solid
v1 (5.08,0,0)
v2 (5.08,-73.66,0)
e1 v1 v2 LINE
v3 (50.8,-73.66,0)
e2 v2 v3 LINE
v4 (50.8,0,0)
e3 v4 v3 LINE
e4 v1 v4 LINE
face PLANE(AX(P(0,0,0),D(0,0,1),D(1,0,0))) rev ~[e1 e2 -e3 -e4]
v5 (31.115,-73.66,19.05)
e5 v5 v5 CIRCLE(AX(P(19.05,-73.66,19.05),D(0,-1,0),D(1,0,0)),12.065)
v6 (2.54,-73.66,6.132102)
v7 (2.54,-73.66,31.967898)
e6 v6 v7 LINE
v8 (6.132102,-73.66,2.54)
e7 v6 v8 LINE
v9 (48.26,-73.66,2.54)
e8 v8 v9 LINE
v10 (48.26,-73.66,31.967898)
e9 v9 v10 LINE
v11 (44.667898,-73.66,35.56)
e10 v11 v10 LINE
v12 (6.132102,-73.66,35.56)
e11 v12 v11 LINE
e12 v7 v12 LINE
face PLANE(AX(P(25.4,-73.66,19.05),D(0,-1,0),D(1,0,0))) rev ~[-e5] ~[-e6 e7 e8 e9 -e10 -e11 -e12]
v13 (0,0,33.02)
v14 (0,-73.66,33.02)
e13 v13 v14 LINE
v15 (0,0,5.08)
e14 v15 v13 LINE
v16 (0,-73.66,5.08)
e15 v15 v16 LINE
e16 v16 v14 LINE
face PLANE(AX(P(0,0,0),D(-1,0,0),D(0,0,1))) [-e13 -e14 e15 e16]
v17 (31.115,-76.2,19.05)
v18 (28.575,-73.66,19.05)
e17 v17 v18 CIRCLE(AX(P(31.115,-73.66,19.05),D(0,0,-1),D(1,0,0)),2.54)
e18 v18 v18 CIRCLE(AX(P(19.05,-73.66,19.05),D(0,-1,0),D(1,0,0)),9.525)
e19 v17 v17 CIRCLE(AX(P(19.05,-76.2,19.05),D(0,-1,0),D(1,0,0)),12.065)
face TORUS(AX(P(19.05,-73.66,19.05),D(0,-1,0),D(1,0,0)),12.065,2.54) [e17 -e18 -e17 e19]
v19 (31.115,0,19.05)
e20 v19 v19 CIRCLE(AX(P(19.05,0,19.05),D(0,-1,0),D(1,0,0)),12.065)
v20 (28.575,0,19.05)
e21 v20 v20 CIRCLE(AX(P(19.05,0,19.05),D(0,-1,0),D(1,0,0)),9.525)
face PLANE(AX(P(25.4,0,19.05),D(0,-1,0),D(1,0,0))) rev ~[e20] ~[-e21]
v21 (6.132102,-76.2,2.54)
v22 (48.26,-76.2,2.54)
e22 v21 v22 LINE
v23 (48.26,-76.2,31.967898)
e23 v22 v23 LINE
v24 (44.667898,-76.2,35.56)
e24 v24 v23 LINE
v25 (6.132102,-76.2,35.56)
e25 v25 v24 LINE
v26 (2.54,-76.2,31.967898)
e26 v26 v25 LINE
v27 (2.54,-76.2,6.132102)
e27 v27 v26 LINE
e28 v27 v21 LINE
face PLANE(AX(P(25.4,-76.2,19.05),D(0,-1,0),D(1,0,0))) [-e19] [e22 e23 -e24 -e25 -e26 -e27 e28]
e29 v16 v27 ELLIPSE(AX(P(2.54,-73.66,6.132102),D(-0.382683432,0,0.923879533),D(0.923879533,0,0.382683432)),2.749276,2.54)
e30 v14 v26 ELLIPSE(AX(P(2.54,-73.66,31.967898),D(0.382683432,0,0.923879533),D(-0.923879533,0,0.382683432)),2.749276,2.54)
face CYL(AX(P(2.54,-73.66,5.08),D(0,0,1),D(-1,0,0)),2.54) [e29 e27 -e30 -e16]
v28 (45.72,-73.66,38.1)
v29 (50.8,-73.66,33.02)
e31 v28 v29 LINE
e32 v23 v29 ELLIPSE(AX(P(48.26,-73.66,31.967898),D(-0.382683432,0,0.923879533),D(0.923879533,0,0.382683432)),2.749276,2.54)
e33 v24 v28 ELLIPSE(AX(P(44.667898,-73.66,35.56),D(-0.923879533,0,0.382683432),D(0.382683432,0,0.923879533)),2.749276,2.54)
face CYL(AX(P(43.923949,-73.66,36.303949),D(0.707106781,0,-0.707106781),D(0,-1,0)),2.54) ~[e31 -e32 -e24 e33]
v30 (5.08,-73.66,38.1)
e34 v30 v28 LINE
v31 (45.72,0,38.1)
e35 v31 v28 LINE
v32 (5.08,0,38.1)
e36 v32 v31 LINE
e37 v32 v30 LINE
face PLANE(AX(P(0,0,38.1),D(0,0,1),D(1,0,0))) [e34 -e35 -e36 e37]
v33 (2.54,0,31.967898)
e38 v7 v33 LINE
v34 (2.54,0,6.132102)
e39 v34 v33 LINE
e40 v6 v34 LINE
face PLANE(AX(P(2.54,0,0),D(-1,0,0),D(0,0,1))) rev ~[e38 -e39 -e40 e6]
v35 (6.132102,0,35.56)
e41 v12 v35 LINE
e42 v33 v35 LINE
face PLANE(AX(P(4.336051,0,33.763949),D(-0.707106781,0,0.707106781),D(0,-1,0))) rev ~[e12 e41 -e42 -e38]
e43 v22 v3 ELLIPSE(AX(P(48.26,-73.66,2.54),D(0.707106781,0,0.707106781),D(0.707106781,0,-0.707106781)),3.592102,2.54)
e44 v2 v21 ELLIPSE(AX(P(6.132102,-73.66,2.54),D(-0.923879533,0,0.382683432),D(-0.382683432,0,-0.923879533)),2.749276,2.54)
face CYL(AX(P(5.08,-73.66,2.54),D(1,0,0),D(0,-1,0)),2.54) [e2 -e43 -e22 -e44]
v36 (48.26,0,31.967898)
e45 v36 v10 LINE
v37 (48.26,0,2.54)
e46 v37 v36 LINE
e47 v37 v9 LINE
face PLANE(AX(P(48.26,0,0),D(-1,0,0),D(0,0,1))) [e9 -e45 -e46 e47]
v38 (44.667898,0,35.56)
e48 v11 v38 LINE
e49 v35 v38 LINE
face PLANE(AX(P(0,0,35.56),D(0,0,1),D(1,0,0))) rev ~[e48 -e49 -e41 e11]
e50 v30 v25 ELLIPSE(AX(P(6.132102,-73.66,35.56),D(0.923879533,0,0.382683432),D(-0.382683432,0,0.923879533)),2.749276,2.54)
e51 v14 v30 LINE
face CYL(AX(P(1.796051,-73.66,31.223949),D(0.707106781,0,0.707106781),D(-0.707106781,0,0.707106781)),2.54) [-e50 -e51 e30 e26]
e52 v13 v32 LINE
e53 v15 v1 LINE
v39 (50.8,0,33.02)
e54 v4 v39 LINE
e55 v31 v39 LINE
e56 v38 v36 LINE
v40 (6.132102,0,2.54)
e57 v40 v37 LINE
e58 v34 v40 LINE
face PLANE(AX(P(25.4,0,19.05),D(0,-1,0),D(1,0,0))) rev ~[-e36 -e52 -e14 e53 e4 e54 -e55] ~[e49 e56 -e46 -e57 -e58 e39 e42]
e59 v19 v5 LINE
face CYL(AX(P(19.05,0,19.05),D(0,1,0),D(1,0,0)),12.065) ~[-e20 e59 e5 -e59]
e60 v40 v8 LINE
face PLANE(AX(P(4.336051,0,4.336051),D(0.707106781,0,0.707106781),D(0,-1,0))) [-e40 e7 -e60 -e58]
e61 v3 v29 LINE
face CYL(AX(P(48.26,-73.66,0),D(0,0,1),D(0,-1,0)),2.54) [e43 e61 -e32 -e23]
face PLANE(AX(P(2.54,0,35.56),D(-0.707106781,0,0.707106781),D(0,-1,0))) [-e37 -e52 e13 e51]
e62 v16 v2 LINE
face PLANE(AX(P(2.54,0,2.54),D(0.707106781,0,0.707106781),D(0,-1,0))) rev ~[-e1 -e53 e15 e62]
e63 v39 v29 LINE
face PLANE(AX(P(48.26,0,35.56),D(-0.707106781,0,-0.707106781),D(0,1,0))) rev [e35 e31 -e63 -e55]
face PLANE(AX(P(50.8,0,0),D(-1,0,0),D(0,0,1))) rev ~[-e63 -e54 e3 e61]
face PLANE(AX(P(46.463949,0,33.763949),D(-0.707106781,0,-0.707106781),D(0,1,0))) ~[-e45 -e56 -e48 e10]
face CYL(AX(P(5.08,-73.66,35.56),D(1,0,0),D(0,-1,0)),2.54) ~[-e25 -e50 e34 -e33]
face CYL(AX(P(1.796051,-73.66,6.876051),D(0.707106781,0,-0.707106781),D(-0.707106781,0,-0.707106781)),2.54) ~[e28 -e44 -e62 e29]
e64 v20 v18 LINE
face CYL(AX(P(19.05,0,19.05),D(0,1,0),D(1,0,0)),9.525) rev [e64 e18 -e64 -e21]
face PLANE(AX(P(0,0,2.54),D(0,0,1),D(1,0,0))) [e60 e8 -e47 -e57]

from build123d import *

# Parameters (mm, degrees)
F0_W     = 50.8
F0_H     = 38.1
F0_R     = 9.525
F1_DEPTH = 76.2
F2_SIZE  = 5.08
F3_SIZE  = 5.08
F4_R     = 2.54
F5_T     = 2.54


# Not quite as in the source:
# - a shell that OpenCascade refuses in one call is made with other operations: the cavity is built on its own and cut out


with BuildPart() as f1:
    # F0 (on Front) → F1 (new body)
    with BuildSketch(Plane.XZ):
        with Locations((25.4, 19.05)):
            Rectangle(F0_W, F0_H)
        with Locations((19.05, 19.05)):
            Circle(F0_R, mode=Mode.SUBTRACT)
    extrude(amount=F1_DEPTH)

    # F2
    f2_edges = [f1.edges().sort_by_distance(p)[0] for p in [
        (0, -38.1, 0),
    ]]
    chamfer(f2_edges, length=F2_SIZE)

    # F3
    f3_edges = [f1.edges().sort_by_distance(p)[0] for p in [
        (0, -38.1, 38.1),
        (50.8, -38.1, 38.1),
    ]]
    chamfer(f3_edges, length=F3_SIZE)

    # F4
    f4_edges = [f1.edges().sort_by_distance(p)[0] for p in [
        (0, -76.2, 19.05),
        (2.54, -76.2, 35.56),
        (2.54, -76.2, 2.54),
        (25.4, -76.2, 38.1),
        (27.94, -76.2, 0),
        (48.26, -76.2, 35.56),
        (50.8, -76.2, 16.51),
        (9.525, -76.2, 19.05),
    ]]
    fillet(f4_edges, radius=F4_R)

    # F5: shell of thickness 2.54, made by hand


with BuildPart() as f5_core1:
    # F5_t2: copy of F1
    add(f1.part)

    # the walls: a layer under each face that stays
    f5_faces = [f5_core1.faces().sort_by_distance(p)[0] for p in [
        (0, -36.83, 19.05),
        (2.54, -36.83, 35.56),
        (2.54, -36.83, 2.54),
        (25.4, -36.83, 38.1),
        (10.16, -76.2, 8.0433333333),
        (27.94, -36.83, 0),
        (48.26, -36.83, 35.56),
        (50.8, -36.83, 16.51),
        (9.525, -36.83, 19.05),
    ]]
    thicken(f5_faces, amount=-F5_T, mode=Mode.SUBTRACT)


with BuildPart() as f1_1:
    add(f1.part)

    # what is left inside the walls is the cavity
    f5_cavity = [f5_core1.part.solids().sort_by_distance(p)[0] for p in [
        (6.9596, -49.106667, 19.05),
    ]]
    add(f5_cavity, mode=Mode.SUBTRACT)


solid = f1_1.part
